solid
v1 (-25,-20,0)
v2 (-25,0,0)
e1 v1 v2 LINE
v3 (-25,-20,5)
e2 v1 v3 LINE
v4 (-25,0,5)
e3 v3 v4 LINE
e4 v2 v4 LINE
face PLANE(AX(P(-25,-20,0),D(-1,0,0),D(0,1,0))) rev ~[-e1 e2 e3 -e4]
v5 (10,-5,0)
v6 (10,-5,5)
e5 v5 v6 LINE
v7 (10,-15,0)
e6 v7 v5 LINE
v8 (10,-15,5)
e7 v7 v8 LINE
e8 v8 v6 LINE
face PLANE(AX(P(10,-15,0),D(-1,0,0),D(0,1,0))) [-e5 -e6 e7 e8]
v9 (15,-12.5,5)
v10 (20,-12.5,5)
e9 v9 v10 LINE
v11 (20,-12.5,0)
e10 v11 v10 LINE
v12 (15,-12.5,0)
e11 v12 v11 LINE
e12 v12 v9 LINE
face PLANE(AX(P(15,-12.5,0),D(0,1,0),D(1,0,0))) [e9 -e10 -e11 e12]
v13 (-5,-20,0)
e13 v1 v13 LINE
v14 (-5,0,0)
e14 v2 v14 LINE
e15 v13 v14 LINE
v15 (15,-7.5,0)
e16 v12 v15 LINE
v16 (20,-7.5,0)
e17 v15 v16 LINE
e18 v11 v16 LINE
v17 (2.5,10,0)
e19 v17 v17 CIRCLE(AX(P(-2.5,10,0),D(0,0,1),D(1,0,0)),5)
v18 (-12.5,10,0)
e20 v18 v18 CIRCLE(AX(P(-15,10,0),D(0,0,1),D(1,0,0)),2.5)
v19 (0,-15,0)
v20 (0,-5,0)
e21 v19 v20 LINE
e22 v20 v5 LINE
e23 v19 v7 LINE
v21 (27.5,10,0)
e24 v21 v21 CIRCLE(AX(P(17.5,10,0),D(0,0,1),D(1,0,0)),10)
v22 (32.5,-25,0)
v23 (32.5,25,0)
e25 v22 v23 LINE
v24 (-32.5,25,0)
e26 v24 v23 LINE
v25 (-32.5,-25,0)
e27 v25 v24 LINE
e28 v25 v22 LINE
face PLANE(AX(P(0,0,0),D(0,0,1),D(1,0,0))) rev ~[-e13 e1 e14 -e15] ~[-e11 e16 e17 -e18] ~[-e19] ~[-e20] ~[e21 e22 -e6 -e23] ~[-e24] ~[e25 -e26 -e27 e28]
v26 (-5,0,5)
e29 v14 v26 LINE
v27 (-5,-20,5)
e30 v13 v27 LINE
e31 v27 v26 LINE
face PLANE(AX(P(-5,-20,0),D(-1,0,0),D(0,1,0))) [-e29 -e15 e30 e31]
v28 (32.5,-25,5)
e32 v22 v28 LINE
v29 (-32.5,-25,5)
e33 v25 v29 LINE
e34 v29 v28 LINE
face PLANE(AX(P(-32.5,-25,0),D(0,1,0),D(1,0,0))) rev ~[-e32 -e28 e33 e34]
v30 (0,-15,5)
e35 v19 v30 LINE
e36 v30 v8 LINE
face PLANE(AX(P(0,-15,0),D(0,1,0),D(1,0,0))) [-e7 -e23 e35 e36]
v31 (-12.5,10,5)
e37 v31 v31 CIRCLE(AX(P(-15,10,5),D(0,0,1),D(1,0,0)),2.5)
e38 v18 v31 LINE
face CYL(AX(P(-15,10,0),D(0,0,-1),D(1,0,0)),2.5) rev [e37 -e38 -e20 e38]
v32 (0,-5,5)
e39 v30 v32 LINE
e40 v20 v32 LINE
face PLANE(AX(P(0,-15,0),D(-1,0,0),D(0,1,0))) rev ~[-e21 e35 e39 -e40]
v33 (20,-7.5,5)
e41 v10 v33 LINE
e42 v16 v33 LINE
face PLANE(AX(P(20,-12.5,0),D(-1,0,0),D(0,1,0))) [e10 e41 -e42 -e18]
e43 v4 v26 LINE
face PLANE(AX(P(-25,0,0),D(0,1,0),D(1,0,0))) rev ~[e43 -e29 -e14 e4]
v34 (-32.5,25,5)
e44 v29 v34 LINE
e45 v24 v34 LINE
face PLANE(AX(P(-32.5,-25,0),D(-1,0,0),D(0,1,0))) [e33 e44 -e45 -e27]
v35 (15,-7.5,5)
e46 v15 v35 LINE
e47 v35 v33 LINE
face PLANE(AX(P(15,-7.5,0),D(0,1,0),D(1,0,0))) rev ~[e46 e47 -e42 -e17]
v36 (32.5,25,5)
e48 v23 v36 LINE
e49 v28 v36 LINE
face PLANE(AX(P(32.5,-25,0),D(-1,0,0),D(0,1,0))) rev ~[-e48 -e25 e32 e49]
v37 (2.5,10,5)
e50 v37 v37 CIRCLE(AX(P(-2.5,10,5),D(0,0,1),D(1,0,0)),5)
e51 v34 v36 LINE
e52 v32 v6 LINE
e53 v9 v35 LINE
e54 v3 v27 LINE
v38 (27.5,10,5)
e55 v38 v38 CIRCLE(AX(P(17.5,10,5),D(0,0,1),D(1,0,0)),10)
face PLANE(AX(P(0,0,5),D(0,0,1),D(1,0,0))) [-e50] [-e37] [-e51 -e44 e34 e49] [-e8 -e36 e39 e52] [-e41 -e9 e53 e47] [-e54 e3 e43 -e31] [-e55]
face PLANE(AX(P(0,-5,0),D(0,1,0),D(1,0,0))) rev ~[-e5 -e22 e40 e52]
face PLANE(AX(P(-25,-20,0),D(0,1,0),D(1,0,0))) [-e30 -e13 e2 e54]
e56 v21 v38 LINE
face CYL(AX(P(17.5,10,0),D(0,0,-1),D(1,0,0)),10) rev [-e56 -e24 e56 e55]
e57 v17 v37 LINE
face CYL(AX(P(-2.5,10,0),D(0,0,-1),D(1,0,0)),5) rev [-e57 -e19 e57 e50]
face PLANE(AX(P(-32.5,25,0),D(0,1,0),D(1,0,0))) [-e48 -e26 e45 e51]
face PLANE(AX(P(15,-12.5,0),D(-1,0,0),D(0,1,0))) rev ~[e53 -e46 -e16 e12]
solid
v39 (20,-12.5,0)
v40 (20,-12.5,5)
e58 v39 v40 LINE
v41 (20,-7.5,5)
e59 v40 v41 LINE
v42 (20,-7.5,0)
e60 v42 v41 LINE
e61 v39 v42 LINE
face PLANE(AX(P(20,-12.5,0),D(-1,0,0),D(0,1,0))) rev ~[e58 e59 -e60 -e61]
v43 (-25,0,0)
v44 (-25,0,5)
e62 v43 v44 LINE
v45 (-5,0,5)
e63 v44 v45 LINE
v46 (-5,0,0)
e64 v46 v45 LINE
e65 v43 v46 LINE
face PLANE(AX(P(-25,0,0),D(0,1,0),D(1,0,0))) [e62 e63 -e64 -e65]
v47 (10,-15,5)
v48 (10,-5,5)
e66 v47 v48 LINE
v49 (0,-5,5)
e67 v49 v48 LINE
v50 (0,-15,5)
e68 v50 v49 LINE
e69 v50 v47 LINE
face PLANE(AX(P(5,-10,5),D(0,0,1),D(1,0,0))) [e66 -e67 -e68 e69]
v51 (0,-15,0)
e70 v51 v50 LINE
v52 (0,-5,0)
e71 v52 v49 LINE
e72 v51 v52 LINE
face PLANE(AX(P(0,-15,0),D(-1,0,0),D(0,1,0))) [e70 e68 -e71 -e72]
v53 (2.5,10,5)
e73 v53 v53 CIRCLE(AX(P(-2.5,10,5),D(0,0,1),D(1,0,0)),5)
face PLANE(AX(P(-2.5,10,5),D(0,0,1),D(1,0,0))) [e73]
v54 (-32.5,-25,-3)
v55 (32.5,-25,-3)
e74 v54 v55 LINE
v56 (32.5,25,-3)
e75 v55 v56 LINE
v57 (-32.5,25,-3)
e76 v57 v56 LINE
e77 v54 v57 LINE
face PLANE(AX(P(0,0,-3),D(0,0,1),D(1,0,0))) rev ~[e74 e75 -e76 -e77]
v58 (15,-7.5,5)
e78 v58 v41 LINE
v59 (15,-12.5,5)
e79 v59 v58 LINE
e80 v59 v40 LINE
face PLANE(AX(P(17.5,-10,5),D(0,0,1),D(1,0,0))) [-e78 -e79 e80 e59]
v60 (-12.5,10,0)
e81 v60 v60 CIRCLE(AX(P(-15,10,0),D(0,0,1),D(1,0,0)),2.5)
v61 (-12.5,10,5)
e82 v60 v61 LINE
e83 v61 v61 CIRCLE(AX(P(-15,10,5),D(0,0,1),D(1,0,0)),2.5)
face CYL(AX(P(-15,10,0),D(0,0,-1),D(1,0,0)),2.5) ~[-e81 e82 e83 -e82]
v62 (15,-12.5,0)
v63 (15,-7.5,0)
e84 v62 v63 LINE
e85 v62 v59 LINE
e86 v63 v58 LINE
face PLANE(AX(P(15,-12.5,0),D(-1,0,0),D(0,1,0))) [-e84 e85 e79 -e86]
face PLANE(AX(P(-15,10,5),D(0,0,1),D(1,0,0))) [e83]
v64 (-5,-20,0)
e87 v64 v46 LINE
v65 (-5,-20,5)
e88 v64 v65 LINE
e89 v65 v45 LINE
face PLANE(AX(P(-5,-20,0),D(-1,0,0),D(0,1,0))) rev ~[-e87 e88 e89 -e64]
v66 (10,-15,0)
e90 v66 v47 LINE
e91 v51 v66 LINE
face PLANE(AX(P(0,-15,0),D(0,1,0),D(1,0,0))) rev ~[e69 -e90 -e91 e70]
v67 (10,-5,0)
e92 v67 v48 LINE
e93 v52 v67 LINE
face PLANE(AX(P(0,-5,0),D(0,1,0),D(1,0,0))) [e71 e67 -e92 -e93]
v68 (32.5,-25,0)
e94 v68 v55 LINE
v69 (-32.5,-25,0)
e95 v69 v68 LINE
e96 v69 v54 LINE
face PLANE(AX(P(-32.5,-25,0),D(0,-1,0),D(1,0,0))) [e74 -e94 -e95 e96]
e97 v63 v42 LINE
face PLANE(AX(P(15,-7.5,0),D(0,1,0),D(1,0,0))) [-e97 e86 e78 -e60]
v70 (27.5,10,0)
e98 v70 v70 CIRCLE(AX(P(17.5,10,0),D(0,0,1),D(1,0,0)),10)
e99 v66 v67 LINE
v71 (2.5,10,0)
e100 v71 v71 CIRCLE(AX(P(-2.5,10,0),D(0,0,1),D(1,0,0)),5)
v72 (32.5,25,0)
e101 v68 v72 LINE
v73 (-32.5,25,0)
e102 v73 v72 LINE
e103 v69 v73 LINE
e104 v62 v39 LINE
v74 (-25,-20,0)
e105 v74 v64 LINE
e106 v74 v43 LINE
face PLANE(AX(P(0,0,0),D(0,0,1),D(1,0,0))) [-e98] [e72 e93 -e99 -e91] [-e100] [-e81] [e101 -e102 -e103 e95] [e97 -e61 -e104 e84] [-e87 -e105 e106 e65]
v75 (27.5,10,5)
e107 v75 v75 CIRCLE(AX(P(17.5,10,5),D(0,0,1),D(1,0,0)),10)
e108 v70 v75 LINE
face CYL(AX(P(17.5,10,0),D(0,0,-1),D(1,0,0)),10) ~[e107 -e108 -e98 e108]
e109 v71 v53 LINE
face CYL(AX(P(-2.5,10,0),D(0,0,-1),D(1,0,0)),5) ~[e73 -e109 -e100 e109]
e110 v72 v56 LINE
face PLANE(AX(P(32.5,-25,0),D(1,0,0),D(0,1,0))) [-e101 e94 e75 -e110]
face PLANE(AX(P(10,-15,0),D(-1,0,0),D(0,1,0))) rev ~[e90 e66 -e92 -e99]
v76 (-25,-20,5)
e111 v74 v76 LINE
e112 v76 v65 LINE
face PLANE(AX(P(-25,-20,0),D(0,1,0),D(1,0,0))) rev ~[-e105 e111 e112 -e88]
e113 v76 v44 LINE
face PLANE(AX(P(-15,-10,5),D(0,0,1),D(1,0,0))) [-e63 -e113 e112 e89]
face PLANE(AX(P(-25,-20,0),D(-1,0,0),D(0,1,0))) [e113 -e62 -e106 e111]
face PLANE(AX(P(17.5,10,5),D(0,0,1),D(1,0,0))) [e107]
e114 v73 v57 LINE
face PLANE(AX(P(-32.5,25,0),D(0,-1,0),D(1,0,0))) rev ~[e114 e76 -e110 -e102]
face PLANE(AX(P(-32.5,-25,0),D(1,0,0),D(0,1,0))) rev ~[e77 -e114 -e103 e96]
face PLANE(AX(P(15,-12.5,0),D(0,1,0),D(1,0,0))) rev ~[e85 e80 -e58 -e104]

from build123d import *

# Parameters (mm, degrees)
F0_W     = 65
F0_H     = 50
F0_W_2   = 20
F0_H_2   = 20
F0_W_3   = 10
F0_H_3   = 10
F0_W_4   = 5
F0_H_4   = 5
F0_R     = 2.5
F0_R_2   = 5
F0_R_3   = 10
F1_DEPTH = 5
F2_DEPTH = 5
F3_DEPTH = 3


with BuildPart() as f1:
    # F0 (on Top) → F1 (new body)
    with BuildSketch(Plane.XY):
        Rectangle(F0_W, F0_H)
        with Locations((-15, -10)):
            Rectangle(F0_W_2, F0_H_2, mode=Mode.SUBTRACT)
        with Locations((5, -10)):
            Rectangle(F0_W_3, F0_H_3, mode=Mode.SUBTRACT)
        with Locations((17.5, -10)):
            Rectangle(F0_W_4, F0_H_4, mode=Mode.SUBTRACT)
        with Locations((-15, 10)):
            Circle(F0_R, mode=Mode.SUBTRACT)
        with Locations((-2.5, 10)):
            Circle(F0_R_2, mode=Mode.SUBTRACT)
        with Locations((17.5, 10)):
            Circle(F0_R_3, mode=Mode.SUBTRACT)
    extrude(amount=F1_DEPTH)


with BuildPart() as f2:
    # F0 (on Top) → F2 (new body)
    with BuildSketch(Plane.XY):
        with Locations((-15, -10)):
            Rectangle(F0_W_2, F0_H_2)
    extrude(amount=F2_DEPTH)



with BuildPart() as f2b:
    # F0 (on Top) → F2, piece 2 (new body)
    with BuildSketch(Plane.XY):
        with Locations((5, -10)):
            Rectangle(F0_W_3, F0_H_3)
    extrude(amount=F2_DEPTH)


with BuildPart() as f2c:
    # F0 (on Top) → F2, piece 3 (new body)
    with BuildSketch(Plane.XY):
        with Locations((17.5, -10)):
            Rectangle(F0_W_4, F0_H_4)
    extrude(amount=F2_DEPTH)


with BuildPart() as f2d:
    # F0 (on Top) → F2, piece 4 (new body)
    with BuildSketch(Plane.XY):
        with Locations((17.5, 10)):
            Circle(F0_R_3)
    extrude(amount=F2_DEPTH)


with BuildPart() as f2e:
    # F0 (on Top) → F2, piece 5 (new body)
    with BuildSketch(Plane.XY):
        with Locations((-2.5, 10)):
            Circle(F0_R_2)
    extrude(amount=F2_DEPTH)


with BuildPart() as f2f:
    # F0 (on Top) → F2, piece 6 (new body)
    with BuildSketch(Plane.XY):
        with Locations((-15, 10)):
            Circle(F0_R)
    extrude(amount=F2_DEPTH)


with BuildPart() as f2_1:
    add(f2.part)

    add(f2b.part)  # F3 merges F2b

    add(f2c.part)  # F3 merges F2c

    add(f2d.part)  # F3 merges F2d

    add(f2e.part)  # F3 merges F2e

    add(f2f.part)  # F3 merges F2f
    # F0 (on Top) → F3 (join)
    with BuildSketch(Plane.XY):
        Rectangle(F0_W, F0_H)
        with Locations((-15, -10)):
            Rectangle(F0_W_2, F0_H_2, mode=Mode.SUBTRACT)
        with Locations((5, -10)):
            Rectangle(F0_W_3, F0_H_3, mode=Mode.SUBTRACT)
        with Locations((17.5, -10)):
            Rectangle(F0_W_4, F0_H_4, mode=Mode.SUBTRACT)
        with Locations((-15, 10)):
            Circle(F0_R, mode=Mode.SUBTRACT)
        with Locations((-2.5, 10)):
            Circle(F0_R_2, mode=Mode.SUBTRACT)
        with Locations((17.5, 10)):
            Circle(F0_R_3, mode=Mode.SUBTRACT)
        with Locations((-15, -10)):
            Rectangle(F0_W_2, F0_H_2)
        with Locations((-15, 10)):
            Circle(F0_R)
        with Locations((-2.5, 10)):
            Circle(F0_R_2)
        with Locations((5, -10)):
            Rectangle(F0_W_3, F0_H_3)
        with Locations((17.5, -10)):
            Rectangle(F0_W_4, F0_H_4)
        with Locations((17.5, 10)):
            Circle(F0_R_3)
    extrude(amount=-F3_DEPTH)


solid = Compound([f1.part, f2_1.part])
